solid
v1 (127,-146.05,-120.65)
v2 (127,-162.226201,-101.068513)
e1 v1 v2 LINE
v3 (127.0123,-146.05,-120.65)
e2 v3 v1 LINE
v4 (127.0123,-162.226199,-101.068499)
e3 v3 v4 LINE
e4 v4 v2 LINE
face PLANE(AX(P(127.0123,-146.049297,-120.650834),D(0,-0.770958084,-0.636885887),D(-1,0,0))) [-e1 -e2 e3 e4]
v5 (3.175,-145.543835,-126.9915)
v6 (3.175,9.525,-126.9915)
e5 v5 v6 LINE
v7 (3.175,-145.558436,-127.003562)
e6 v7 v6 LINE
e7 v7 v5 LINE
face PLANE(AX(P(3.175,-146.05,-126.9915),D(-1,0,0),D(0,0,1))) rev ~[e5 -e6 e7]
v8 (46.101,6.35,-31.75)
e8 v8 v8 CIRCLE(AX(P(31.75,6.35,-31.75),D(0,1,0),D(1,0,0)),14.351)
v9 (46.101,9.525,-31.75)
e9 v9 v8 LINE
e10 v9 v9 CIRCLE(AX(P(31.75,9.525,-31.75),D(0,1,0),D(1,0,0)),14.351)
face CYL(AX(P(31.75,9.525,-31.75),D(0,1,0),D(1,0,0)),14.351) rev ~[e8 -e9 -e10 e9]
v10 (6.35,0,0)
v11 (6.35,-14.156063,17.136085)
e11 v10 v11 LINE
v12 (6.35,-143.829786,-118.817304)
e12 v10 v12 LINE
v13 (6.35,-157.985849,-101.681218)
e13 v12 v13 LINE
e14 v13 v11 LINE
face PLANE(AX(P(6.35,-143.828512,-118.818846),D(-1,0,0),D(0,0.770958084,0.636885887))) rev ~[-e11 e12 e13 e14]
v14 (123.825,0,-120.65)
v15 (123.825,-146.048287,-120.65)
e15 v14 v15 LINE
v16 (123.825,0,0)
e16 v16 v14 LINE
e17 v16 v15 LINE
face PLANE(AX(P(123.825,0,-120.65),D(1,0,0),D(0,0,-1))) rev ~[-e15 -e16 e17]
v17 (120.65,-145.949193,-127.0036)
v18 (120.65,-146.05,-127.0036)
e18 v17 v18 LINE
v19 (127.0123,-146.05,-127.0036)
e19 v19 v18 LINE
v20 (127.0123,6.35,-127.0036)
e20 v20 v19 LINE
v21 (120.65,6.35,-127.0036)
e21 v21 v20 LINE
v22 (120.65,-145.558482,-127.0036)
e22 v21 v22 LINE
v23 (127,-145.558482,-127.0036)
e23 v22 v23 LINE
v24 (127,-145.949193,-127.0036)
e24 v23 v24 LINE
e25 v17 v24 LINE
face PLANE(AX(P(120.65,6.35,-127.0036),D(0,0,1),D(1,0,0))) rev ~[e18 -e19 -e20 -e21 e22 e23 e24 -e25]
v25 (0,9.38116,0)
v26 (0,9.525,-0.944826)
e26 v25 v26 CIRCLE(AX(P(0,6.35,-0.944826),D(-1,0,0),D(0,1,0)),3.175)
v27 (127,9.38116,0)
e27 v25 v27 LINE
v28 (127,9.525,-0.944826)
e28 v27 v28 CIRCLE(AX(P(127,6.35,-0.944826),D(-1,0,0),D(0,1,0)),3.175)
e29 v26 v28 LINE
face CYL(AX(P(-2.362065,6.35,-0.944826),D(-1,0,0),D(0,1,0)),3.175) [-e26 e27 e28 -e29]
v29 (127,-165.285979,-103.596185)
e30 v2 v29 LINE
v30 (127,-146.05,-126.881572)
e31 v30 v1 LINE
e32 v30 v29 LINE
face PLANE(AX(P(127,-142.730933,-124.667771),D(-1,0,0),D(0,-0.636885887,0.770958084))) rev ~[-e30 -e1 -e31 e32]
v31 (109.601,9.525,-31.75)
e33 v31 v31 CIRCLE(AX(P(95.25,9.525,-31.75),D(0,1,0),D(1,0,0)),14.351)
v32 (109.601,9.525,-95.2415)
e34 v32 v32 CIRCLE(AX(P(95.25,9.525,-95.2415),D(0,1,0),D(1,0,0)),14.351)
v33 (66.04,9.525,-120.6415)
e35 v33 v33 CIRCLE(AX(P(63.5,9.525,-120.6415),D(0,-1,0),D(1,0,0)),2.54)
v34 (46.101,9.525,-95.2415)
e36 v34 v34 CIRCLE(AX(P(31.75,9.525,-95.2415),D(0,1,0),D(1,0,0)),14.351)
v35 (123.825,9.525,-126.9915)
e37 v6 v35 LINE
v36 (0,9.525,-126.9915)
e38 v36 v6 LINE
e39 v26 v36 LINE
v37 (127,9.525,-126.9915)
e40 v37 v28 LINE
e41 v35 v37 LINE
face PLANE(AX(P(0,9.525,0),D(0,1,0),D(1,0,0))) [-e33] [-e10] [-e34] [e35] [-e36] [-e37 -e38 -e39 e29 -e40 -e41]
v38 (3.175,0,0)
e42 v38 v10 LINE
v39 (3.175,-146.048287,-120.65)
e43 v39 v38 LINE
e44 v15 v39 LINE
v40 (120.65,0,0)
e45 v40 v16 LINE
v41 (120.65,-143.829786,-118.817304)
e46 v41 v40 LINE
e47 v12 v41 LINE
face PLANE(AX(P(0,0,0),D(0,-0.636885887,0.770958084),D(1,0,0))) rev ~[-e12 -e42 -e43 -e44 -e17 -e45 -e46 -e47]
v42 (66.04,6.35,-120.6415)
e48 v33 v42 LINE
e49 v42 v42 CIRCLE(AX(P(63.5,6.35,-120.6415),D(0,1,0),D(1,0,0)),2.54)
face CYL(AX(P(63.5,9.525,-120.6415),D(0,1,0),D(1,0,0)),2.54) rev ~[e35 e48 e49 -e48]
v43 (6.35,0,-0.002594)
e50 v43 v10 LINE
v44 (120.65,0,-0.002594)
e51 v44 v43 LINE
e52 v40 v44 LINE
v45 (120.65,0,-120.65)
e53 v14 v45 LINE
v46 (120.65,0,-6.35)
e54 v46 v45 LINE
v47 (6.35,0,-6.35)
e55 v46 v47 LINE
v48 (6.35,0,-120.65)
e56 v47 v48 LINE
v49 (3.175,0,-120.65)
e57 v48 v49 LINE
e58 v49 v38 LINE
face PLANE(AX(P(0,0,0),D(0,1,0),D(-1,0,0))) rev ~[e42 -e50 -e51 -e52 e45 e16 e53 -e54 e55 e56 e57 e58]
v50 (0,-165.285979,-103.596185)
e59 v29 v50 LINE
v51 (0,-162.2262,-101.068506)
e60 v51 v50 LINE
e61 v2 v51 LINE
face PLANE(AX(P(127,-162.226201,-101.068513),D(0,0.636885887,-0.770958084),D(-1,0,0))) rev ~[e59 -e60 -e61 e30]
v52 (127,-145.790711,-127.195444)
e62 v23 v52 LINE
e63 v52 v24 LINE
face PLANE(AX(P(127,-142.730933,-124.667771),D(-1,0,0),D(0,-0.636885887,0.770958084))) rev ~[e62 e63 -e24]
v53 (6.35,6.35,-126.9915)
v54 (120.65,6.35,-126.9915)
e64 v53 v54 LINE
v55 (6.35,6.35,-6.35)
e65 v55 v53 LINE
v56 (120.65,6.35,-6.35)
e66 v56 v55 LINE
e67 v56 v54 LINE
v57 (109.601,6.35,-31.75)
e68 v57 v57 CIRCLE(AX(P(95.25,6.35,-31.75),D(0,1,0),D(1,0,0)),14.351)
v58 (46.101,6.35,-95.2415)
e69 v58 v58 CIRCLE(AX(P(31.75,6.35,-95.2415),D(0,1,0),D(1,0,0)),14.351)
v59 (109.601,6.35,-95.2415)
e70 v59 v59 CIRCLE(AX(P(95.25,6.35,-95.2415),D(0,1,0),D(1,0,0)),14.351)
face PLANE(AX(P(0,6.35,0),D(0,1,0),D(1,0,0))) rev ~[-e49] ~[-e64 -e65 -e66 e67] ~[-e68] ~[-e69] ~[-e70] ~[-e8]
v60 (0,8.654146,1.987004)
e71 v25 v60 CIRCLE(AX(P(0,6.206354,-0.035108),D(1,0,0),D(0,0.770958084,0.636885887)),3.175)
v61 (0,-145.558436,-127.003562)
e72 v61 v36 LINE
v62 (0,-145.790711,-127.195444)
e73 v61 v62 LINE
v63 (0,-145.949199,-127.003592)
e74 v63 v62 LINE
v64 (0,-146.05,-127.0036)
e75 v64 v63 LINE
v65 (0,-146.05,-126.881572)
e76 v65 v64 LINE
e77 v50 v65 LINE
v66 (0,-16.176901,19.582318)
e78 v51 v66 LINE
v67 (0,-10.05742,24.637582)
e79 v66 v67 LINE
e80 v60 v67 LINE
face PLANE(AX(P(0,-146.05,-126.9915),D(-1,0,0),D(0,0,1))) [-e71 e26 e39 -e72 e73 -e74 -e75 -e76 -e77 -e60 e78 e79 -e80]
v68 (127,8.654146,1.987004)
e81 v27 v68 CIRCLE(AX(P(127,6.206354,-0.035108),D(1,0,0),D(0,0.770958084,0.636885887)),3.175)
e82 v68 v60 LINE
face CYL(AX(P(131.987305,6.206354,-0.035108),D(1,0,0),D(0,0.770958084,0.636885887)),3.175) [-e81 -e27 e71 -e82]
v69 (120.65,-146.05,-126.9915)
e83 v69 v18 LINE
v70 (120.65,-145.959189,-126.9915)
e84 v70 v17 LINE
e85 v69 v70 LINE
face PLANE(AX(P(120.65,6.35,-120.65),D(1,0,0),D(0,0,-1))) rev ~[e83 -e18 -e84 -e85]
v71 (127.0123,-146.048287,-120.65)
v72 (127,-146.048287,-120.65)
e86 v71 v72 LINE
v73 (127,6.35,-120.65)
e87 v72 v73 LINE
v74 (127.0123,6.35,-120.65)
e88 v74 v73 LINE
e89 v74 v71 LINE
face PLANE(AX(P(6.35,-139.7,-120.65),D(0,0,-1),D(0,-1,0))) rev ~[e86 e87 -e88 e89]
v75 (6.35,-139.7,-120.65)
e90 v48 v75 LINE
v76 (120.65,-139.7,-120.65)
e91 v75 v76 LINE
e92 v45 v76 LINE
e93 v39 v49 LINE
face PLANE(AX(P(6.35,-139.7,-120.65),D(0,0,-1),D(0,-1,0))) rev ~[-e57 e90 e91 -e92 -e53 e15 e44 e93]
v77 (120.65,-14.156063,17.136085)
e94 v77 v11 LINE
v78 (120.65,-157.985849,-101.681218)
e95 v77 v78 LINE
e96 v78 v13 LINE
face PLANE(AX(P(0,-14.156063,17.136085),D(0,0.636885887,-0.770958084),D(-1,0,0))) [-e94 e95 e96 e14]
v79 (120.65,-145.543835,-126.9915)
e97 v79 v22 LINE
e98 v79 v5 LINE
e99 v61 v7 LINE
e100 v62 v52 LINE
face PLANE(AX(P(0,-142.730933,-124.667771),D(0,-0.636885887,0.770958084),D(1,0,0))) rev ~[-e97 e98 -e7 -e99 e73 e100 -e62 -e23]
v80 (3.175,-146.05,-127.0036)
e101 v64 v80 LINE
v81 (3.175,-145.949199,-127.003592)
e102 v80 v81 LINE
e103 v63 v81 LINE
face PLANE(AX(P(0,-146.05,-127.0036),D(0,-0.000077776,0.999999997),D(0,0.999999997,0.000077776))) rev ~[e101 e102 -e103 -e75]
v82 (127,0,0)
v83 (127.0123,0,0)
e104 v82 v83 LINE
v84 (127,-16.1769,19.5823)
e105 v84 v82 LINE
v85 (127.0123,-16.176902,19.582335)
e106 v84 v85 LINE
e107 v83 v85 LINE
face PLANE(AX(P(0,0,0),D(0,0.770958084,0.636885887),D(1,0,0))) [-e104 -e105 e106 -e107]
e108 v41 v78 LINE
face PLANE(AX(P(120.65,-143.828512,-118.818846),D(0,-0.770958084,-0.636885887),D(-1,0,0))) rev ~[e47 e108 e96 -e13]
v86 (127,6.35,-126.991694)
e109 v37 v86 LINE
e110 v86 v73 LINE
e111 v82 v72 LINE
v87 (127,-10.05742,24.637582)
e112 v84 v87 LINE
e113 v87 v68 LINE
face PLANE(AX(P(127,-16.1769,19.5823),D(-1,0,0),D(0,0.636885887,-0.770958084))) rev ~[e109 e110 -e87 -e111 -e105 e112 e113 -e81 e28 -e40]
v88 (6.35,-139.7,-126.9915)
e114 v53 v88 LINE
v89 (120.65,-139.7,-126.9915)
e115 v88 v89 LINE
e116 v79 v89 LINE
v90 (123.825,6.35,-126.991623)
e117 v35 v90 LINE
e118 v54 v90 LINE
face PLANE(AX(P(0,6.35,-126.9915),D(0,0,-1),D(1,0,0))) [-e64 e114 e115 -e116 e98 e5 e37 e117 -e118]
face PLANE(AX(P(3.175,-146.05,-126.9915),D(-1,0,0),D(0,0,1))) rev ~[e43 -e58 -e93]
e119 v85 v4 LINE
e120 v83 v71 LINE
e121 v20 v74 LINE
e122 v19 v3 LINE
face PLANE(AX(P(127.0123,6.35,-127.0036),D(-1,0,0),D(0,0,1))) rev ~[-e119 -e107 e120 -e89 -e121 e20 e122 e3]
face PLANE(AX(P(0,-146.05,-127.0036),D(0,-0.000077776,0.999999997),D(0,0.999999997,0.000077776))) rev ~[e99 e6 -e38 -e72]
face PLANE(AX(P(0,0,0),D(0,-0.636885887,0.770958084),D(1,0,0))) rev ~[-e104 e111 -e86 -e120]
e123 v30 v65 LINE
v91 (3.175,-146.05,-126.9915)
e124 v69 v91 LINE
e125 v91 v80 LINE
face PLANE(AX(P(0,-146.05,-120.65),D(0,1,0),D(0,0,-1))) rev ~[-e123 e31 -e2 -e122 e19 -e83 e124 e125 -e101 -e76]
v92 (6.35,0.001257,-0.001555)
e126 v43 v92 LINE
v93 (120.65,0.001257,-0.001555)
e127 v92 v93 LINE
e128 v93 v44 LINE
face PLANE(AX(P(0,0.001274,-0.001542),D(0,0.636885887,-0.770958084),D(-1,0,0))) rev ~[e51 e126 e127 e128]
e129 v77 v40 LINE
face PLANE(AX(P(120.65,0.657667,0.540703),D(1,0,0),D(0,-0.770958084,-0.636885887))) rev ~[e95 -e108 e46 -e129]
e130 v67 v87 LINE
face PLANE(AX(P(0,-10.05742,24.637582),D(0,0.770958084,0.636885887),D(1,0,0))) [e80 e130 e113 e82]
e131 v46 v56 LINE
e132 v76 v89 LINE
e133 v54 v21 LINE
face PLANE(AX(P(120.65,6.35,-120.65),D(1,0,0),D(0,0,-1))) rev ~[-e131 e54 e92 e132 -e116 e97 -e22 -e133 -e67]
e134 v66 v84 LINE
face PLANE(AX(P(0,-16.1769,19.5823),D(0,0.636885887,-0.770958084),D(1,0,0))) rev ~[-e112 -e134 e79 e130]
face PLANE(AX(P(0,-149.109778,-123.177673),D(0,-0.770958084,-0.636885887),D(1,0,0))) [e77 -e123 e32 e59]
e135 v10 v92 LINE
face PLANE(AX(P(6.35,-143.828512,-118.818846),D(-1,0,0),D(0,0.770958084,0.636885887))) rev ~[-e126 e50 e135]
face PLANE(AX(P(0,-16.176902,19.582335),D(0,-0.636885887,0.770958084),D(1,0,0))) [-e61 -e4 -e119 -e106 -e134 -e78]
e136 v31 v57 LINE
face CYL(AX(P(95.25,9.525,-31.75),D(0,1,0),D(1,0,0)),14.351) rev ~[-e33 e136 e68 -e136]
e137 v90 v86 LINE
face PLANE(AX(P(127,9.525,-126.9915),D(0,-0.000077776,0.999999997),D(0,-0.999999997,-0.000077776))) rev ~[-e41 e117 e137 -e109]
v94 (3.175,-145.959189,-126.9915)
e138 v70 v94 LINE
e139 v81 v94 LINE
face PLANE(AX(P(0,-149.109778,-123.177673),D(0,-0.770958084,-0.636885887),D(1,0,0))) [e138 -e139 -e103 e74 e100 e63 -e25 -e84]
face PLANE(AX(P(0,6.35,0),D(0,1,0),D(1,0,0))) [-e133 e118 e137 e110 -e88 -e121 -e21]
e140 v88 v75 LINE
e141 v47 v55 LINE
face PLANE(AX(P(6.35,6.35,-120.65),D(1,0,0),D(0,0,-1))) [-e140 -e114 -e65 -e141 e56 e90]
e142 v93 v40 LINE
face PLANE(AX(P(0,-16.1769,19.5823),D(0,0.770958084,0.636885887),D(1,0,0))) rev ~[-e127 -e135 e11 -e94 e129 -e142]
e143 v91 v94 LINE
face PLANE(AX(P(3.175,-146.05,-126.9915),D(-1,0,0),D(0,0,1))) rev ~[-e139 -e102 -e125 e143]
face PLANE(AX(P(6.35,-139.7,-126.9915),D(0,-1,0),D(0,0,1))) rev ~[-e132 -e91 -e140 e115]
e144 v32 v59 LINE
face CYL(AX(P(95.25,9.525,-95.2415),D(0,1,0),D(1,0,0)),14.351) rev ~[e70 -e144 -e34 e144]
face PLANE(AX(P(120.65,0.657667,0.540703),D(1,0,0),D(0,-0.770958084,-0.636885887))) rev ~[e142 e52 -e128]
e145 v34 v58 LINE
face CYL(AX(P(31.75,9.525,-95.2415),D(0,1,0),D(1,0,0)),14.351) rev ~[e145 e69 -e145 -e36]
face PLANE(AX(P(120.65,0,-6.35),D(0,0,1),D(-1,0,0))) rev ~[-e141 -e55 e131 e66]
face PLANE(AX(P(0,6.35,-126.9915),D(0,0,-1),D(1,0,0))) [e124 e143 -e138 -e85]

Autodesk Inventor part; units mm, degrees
ref_plane "YZ Plane" through (0, 0, 0) normal (1, 0, 0) x (0, 1, 0)
ref_plane "XZ Plane" through (0, 0, 0) normal (0, 1, 0) x (-1, 0, 0)
ref_plane "XY Plane" through (0, 0, 0) normal (0, 0, 1) x (1, 0, 0)
sketch "Sketch1" plane through (0, 0, 0) normal (0, 1, 0) x (-1, 0, 0)
  line L0 (0, 0) -> (-127, 0)
  line L1 (-127, 0) -> (-127, -6.35)
  line L2 (-127, -6.35) -> (0, -6.35)
  line L3 (0, -6.35) -> (0, 0)
  line L4 (0, -6.35) -> (-6.35, -6.35)
  line L5 (-6.35, -6.35) -> (-6.35, -127)
  line L6 (-6.35, -127) -> (0, -127)
  line L7 (0, -127) -> (0, -6.35)
  line L8 (-127, -6.35) -> (-120.65, -6.35)
  line L9 (-120.65, -6.35) -> (-120.65, -127)
  line L10 (-120.65, -127) -> (-127, -127)
  line L11 (-127, -127) -> (-127, -6.35)
  dimension "d0" = 127
  dimension "d1" = 6.35
  dimension "d2" = 6.35
  dimension "d3" = 120.65
  dimension "d4" = 120.65
  dimension "d5" = 6.35
extrude "Extrusion1" add sketch "Sketch1" along normal blind 6.35
sketch "Sketch2" plane through (127, 0, 0) normal (1, 0, 0) x (0, 0, -1)
  line L0 (127, 6.35) -> (120.65, 0)
  line L1 (6.35, 0) -> (127, 0) projected
  line L2 (127, 0) -> (127, 6.35) projected
  line L3 (120.65, 0) -> (127, 0)
  line L4 (127, 0) -> (127, 6.35) projected
  line L5 (127, 6.35) -> (127, 0)
  point P0 (0, 0)
  dimension "d8" = 135
extrude "Extrusion2" cut sketch "Sketch2" against normal blind 152.4
sketch "Sketch4" plane through (0, 6.35, 0) normal (0, 1, 0) x (1, 0, 0)
  line L0 (127, 120.65) -> (127, 127)
  line L1 (127, 120.65) -> (127, 127) projected
  line L2 (127, 127) -> (120.65, 127)
  line L3 (120.65, 127) -> (120.65, 120.65)
  line L4 (120.65, 120.65) -> (127, 120.65)
  point P0 (0, 0)
extrude "Extrusion3" cut sketch "Sketch4" against normal blind 152.4
sketch "Sketch5" plane through (0, 6.35, 0) normal (0, 1, 0) x (1, 0, 0)
  line L0 (120.65, 120.65) -> (120.65, 127.0036)
  line L1 (120.65, 127.0036) -> (127.0123, 127.0036)
  line L2 (127.0123, 127.0036) -> (127.0123, 120.65)
  line L3 (127.0123, 120.65) -> (120.65, 120.65)
  point P0 (0, 0)
extrude "Extrusion4" add sketch "Sketch5" against normal blind 152.4
sketch "Sketch6" plane through (0, 6.35, 0) normal (0, 1, 0) x (1, 0, 0)
  line L0 (0, 127) -> (0, 120.65)
  line L1 (0, 127) -> (0, 120.65) projected
  line L2 (0, 120.65) -> (6.35, 120.65)
  line L3 (0, 120.65) -> (6.35, 120.65) projected
  line L4 (6.35, 120.65) -> (6.35, 127)
  line L5 (6.35, 127) -> (0, 127)
  point P0 (0, 0)
extrude "Extrusion5" cut sketch "Sketch6" against normal blind 101.6
sketch "Sketch7" plane through (0, 6.35, 0) normal (0, 1, 0) x (1, 0, 0)
  line L0 (0, 120.65) -> (6.35, 120.65)
  line L1 (6.35, 120.65) -> (6.35, 126.9915)
  line L2 (6.35, 126.9915) -> (0, 126.9915)
  line L3 (0, 126.9915) -> (0, 120.65)
  point P0 (0, 0)
extrude "Extrusion6" add sketch "Sketch7" against normal blind 152.4
sketch "Sketch8" plane through (6.35, 0, -6.35) normal (1, 0, 0) x (0, 0, -1)
  line L0 (120.6415, 6.35) -> (120.6415, -146.05) projected
  line L1 (114.3, -146.05) -> (120.6415, -146.05)
  line L2 (120.6415, -146.05) -> (120.6415, -139.7)
  line L3 (120.6415, -139.7) -> (114.3, -139.7)
  line L4 (114.3, -139.7) -> (114.3, -146.05)
  point P0 (-6.35, 0)
  dimension "d19" = 6.35
extrude "Extrusion7" add sketch "Sketch8" along normal blind 120.65
sketch "Sketch9" plane through (0, 6.35, 0) normal (0, 1, 0) x (1, 0, 0)
  line L0 (0, 126.9915) -> (127, 126.9915)
  line L1 (127, 126.9915) -> (127, 0)
  line L2 (127, 0) -> (0, 0)
  line L3 (0, 0) -> (0, 126.9915)
extrude "Extrusion8" add sketch "Sketch9" along normal blind 3.175
sketch "Sketch10" plane through (0, 9.525, 0) normal (0, 1, 0) x (1, 0, 0)
  circle A0 centre (31.75, 95.2415) radius 14.351
  circle A1 centre (95.25, 95.2415) radius 14.351
  circle A2 centre (31.75, 31.75) radius 14.351
  circle A3 centre (95.25, 31.75) radius 14.351
  line L0 (0, 126.9915) -> (0, 0) projected
  line L1 (127, 0) -> (127, 126.9915) projected
  line L2 (127, 126.9915) -> (0, 126.9915) projected
  line L3 (0, 0) -> (127, 0) projected
  dimension "d24" = 28.702
  dimension "d25" = 28.702
  dimension "d26" = 28.702
  dimension "d27" = 28.702
  dimension "d28" = 31.75
  dimension "d29" = 31.75
  dimension "d30" = 31.75
  dimension "d31" = 31.75
  dimension "d32" = 31.75
  dimension "d33" = 31.75
  dimension "d34" = 31.75
  dimension "d35" = 31.75
extrude "Extrusion9" cut sketch "Sketch10" against normal blind 25.4 contours A0 | A1 | A2 | A3
ref_plane "Work Plane1" through (0, 0, 0) normal (0, -0.6368859, 0.7709581) x (1, 0, 0)
sketch "Sketch12" plane through (127, 0, -120.65) normal (1, 0, 0) x (0, 0, -1)
  line L0 (6.3415, 9.525) -> (6.3536, -146.05)
  line L1 (6.3536, -146.05) -> (0, -146.05)
  line L2 (6.3536, -146.05) -> (0, -146.05) projected
  line L3 (0, -146.05) -> (-120.65, 0)
  line L4 (-120.65, 0) -> (-120.65, 9.525)
  line L5 (-120.65, 0) -> (-120.65, 9.525) projected
  line L6 (-120.65, 9.525) -> (6.3415, 9.525)
  line L7 (-120.65, 9.525) -> (6.3415, 9.525) projected
extrude "Extrusion11" add sketch "Sketch12" against normal blind 3.175
sketch "Sketch13" plane through (0, -146.05, -126.9915) normal (-1, 0, 0) x (0, 0, 1)
  line L0 (-0.0121, 0) -> (0, 155.575)
  line L1 (0, 155.575) -> (126.9915, 155.575)
  line L2 (126.9915, 155.575) -> (0, 155.575) projected
  line L3 (126.9915, 155.575) -> (126.9915, 146.05)
  line L4 (126.9915, 146.05) -> (6.3415, 0)
  line L5 (6.3415, 0) -> (126.9915, 146.05) projected
  line L6 (6.3415, 0) -> (-0.0121, 0)
extrude "Extrusion12" add sketch "Sketch13" against normal blind 3.175
sketch "Sketch15" plane through (0, 0, 0) normal (0, -0.6368859, 0.7709581) x (1, 0, 0)
  line L0 (127.0123, -189.4387) -> (0, -189.4387)
  line L1 (0, -189.4387) -> (0, 0)
  line L2 (0, 0) -> (127.0123, 0)
  line L3 (127.0123, 0) -> (127.0123, -189.4387)
extrude "Extrusion14" add sketch "Sketch15" along normal blind 25.4
sketch "Sketch16" plane through (0, 0, 0) normal (0, 0.6368859, -0.7709581) x (-1, 0, 0)
  line L0 (-6.35, 0.8514) -> (-120.65, 0.8514)
  line L1 (-120.65, 0.8514) -> (-120.65, -186.5598)
  line L2 (-120.65, -186.5598) -> (-6.35, -186.5598)
  line L3 (-6.35, -186.5598) -> (-6.35, 0.8514)
  point P0 (0, 0)
extrude "Extrusion15" cut sketch "Sketch16" against normal blind 22.225
sketch "Sketch17" plane through (0, -16.1769, 19.5823) normal (0, 0.7709581, 0.6368859) x (1, 0, 0)
  line L0 (127, 122.4603) -> (127, 25.4) projected
  line L1 (0, 0) -> (127, 0)
  line L2 (127, 0) -> (127, 31.3747)
  line L3 (127, 31.3747) -> (0, 31.3747)
  line L4 (0, 31.3747) -> (0, 0)
  point P0 (0, 25.4)
extrude "Extrusion16" add sketch "Sketch17" along normal blind 7.9375
fillet "Fillet1" radius 3.175 2 edges at (63.5, 9.525, 0) (63.5, 9.9247, 0.4491)
sketch "Sketch19" plane through (0, -146.05, -120.65) normal (0, -0.7709581, -0.6368859) x (1, 0, 0)
  line L0 (127, 25.3989) -> (0, 25.3989)
  line L1 (0, 25.3989) -> (0, -5.2114)
  line L2 (0, -5.2114) -> (127, -5.2114)
  line L3 (127, -5.2114) -> (127, 25.3989)
  point P0 (0, -0.0011)
extrude "Extrusion17" add sketch "Sketch19" along normal blind 3.9688
sketch "Sketch23" plane through (0, 9.525, 0) normal (0, 1, 0) x (1, 0, 0)
  line L0 (6.35, 118.8173) -> (120.65, 118.8173) projected
  line L1 (123.825, 126.9915) -> (3.175, 126.9915) projected
  circle A0 centre (63.5, 120.6415) radius 2.54
  line L2 (0, 126.9915) -> (0, 0.9451) projected
  line L3 (127, 0.9451) -> (127, 126.9915) projected
  point P0 (0, 0)
  dimension "d78" = 6.35
  dimension "d80" = 63.5
  dimension "d82" = 5.08
extrude "Extrusion21" cut sketch "Sketch23" against normal blind 7.62
properties part number "button_angle"
